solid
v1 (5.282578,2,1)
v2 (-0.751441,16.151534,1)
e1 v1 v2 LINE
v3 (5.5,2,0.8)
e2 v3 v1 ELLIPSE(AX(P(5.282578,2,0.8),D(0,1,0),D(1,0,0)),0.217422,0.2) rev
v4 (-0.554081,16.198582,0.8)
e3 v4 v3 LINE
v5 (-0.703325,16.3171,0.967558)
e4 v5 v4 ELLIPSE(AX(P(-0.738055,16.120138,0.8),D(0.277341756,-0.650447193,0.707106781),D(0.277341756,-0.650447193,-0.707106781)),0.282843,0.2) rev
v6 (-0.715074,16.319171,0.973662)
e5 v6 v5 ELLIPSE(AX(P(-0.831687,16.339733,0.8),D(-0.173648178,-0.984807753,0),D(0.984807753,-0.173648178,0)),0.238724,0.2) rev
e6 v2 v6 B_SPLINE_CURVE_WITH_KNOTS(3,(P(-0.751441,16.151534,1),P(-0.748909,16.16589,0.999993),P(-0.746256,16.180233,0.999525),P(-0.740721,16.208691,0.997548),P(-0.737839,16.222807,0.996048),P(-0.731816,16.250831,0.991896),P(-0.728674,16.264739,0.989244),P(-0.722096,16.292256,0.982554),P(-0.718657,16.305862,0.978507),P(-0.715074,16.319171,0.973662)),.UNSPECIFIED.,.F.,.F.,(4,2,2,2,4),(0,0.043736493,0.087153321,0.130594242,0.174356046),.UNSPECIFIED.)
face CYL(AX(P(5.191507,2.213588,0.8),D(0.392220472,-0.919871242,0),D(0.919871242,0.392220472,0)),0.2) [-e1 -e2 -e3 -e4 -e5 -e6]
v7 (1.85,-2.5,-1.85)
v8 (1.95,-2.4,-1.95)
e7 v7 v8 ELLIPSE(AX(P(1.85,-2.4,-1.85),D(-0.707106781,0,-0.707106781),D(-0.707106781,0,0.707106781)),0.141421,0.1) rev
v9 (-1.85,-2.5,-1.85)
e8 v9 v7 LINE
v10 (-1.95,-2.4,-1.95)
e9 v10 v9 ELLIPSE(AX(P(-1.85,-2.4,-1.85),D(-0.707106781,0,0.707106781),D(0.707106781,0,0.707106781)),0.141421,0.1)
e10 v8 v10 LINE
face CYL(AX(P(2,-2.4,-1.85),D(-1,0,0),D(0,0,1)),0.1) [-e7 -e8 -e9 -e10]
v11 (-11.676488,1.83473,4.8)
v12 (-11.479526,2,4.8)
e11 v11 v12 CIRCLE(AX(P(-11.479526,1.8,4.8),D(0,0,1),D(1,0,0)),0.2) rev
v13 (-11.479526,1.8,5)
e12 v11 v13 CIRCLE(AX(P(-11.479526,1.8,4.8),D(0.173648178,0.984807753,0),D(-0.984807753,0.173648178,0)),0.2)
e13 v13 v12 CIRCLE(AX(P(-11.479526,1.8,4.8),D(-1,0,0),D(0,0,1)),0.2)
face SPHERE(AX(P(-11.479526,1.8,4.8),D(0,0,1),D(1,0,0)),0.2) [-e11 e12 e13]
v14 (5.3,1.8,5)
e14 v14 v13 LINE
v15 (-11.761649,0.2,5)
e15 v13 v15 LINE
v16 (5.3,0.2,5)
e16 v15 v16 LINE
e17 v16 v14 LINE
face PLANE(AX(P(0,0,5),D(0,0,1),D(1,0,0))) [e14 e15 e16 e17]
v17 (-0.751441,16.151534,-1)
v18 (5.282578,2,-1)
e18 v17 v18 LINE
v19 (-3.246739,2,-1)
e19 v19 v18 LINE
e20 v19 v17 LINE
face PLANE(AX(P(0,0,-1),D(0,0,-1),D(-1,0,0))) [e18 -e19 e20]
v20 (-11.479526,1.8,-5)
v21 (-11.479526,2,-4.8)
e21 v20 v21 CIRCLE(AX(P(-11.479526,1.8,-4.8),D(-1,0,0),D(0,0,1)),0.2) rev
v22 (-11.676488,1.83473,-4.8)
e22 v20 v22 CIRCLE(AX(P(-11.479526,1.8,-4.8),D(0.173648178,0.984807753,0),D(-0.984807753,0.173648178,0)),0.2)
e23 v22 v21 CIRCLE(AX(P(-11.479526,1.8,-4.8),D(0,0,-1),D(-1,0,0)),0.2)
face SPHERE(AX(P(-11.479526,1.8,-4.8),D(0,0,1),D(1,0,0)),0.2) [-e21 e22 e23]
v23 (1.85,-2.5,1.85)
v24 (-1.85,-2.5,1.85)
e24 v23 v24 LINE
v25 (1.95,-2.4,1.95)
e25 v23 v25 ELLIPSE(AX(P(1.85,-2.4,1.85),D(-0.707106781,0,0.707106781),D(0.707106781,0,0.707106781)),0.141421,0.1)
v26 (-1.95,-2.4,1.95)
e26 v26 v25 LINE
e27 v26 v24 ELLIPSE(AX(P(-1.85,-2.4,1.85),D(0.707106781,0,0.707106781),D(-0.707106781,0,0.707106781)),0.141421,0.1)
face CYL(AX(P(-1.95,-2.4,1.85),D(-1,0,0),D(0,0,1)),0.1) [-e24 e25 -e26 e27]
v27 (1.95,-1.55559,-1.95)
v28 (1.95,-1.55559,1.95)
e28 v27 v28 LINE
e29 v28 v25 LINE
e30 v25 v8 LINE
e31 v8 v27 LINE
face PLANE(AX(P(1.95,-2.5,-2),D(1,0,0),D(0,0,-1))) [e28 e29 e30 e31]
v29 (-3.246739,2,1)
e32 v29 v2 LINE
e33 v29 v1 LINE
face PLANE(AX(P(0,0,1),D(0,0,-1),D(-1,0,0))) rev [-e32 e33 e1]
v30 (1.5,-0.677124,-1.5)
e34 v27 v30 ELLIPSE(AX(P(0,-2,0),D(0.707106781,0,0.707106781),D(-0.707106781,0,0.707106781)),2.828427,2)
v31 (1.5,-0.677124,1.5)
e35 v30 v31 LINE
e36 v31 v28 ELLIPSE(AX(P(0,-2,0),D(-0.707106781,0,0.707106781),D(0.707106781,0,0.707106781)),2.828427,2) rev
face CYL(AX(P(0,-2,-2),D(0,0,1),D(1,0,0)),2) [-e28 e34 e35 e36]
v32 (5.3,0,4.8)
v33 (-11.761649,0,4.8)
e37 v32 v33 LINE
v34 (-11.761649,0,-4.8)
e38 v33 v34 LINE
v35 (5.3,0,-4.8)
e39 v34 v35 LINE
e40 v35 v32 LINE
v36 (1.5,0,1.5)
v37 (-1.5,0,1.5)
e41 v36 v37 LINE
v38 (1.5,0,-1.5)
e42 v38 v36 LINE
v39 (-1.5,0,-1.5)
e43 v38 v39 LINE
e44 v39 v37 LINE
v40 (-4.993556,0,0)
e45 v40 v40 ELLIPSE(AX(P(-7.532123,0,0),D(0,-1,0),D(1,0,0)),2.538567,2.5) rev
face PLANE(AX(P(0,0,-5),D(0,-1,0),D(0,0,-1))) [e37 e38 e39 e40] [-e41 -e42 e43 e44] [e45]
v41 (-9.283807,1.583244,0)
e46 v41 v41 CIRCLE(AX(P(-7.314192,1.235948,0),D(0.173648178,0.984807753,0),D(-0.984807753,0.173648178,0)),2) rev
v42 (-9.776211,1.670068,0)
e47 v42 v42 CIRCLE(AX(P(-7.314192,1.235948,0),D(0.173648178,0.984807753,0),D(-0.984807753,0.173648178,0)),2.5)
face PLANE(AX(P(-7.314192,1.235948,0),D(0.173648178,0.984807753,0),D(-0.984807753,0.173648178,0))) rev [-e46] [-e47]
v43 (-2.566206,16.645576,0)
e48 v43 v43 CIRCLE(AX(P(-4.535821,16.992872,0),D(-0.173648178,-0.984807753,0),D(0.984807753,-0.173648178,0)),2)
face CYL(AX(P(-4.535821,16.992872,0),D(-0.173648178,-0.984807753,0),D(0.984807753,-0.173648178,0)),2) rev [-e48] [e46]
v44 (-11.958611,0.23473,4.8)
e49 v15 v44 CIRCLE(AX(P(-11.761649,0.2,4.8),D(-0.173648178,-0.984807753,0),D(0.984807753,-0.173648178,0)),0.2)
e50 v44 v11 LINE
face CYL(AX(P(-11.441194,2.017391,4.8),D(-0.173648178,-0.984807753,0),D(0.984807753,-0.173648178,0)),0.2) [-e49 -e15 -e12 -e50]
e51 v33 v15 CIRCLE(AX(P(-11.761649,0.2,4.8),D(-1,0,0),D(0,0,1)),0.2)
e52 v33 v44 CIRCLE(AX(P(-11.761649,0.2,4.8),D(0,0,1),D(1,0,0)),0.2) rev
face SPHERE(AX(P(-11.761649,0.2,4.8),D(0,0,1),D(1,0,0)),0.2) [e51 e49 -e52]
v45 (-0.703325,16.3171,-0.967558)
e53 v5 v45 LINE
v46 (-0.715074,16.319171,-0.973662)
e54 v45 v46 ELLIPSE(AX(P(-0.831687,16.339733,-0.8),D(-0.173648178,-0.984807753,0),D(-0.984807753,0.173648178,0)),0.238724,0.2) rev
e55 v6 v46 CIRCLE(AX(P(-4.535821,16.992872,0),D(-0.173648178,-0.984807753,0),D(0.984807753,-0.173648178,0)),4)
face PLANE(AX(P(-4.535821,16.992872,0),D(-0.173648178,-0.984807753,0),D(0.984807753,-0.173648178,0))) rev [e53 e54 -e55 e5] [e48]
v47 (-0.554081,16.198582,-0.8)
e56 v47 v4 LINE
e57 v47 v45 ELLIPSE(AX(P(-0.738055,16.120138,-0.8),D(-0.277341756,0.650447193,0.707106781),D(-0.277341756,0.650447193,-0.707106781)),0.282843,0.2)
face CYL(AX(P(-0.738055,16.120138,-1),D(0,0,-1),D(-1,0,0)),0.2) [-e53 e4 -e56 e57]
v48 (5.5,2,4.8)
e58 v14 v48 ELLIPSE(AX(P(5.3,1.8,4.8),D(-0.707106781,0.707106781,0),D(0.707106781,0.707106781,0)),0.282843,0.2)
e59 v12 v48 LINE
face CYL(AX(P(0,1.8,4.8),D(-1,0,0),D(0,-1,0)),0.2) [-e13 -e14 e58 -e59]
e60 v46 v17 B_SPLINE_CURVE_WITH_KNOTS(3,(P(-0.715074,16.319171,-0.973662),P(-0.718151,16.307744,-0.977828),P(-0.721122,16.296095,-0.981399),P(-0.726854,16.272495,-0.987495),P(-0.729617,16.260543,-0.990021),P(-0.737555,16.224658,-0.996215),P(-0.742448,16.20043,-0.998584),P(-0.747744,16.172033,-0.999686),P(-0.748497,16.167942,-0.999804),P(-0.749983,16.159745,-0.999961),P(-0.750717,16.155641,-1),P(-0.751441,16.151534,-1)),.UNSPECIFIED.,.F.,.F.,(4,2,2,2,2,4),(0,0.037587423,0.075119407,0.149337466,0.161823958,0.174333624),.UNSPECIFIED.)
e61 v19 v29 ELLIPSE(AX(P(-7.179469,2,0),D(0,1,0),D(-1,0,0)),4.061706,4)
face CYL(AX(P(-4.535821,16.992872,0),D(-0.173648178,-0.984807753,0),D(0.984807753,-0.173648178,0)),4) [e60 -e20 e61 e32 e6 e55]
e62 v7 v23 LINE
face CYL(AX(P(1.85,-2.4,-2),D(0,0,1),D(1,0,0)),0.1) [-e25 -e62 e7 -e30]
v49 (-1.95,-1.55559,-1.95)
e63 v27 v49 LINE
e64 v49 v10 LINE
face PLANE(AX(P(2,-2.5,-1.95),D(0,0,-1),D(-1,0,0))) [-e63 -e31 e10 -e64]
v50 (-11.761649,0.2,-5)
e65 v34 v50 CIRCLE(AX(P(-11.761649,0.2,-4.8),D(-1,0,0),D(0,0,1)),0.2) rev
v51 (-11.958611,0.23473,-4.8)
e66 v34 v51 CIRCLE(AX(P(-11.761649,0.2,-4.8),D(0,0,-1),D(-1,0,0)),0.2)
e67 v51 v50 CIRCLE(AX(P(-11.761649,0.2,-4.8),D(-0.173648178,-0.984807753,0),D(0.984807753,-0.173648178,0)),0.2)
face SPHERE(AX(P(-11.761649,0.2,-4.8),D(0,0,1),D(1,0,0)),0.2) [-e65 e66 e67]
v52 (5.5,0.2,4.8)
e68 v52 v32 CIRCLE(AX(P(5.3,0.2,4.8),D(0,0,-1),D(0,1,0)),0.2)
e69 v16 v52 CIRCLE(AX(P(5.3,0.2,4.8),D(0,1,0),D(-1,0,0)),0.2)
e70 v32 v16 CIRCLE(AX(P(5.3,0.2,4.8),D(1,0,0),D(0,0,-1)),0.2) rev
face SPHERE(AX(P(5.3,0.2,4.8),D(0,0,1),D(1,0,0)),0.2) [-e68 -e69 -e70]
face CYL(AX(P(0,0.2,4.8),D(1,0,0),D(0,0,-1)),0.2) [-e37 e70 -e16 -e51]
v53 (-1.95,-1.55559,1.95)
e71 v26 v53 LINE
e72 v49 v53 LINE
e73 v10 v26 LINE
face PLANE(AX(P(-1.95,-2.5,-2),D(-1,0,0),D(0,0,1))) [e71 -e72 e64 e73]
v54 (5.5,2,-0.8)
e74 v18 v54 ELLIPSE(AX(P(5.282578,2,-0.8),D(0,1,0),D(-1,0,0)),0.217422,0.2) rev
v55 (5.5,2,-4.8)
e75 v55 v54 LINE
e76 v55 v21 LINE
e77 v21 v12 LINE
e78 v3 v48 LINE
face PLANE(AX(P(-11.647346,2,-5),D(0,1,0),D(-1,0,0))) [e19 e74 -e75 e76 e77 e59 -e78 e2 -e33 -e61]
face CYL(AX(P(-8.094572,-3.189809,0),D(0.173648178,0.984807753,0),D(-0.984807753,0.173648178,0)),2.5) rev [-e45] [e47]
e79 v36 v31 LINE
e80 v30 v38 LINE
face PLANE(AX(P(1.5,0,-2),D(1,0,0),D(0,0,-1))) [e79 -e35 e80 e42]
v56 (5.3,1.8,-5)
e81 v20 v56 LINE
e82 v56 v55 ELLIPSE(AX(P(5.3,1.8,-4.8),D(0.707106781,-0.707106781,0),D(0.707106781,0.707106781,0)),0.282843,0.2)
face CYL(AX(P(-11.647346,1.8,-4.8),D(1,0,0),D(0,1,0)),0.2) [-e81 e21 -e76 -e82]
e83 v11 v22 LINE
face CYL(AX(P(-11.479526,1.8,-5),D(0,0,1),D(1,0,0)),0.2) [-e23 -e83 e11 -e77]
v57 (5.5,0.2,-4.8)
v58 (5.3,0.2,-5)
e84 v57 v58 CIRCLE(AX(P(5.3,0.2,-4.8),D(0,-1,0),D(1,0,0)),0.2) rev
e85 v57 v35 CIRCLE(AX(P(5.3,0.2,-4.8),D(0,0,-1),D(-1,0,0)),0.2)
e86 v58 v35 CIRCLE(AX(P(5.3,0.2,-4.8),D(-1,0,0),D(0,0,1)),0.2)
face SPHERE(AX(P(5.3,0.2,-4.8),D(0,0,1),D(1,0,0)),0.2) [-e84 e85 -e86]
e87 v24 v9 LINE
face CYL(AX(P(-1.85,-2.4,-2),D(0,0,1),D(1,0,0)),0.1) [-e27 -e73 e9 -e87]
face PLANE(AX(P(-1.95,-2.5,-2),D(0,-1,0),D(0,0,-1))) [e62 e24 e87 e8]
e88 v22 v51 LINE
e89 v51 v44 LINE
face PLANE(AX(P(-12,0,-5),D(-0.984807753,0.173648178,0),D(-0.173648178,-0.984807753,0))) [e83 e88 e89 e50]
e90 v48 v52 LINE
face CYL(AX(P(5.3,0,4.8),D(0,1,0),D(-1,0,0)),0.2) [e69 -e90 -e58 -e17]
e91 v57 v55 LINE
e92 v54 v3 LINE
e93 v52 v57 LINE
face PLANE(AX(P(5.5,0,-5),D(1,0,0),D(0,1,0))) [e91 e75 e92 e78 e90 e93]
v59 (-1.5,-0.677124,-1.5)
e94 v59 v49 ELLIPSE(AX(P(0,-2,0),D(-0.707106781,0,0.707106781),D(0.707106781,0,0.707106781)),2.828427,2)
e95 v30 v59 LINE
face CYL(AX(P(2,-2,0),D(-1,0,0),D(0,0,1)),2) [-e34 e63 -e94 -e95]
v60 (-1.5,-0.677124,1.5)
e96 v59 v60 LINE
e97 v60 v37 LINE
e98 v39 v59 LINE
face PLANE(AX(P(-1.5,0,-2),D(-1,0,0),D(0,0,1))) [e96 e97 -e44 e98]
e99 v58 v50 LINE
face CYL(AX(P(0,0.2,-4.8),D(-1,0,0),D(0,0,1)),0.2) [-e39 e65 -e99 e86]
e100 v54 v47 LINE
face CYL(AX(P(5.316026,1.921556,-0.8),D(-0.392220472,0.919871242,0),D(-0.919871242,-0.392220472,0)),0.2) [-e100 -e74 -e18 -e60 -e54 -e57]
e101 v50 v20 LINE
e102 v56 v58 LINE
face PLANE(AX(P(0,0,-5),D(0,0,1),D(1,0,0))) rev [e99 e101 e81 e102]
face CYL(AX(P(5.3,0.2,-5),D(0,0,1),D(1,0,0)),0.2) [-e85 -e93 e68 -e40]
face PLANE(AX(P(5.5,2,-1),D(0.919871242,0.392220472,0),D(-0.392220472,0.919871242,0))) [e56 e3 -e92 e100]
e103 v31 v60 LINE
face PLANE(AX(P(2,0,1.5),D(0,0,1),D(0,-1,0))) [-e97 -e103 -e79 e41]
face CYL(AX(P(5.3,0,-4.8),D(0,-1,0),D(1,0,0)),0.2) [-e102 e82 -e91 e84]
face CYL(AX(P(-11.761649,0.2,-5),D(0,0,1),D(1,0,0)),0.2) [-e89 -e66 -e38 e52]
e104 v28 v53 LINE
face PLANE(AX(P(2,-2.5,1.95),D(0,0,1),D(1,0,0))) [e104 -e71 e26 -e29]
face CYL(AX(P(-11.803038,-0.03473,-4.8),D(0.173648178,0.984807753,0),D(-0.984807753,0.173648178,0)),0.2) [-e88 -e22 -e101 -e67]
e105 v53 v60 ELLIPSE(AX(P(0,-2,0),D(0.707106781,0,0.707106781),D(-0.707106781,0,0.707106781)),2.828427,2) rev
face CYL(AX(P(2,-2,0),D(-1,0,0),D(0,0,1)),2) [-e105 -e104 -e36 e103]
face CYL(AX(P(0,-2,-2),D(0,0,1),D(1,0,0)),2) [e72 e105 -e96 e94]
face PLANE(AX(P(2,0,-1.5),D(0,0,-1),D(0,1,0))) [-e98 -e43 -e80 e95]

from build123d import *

# Parameters (mm, degrees)
EXTRUDE_1_DEPTH          = 5
EXTRUDE_1_DEPTH_BACK     = 5
EXTRUDE_2_DEPTH          = 2
EXTRUDE_2_DEPTH_BACK     = 2
CUT_EXTRUDE_1_DEPTH      = 2
CUT_EXTRUDE_1_DEPTH_BACK = 2
SKETCH_5_R               = 4
SKETCH_5_R_2             = 2
EXTRUDE_3_DEPTH          = 16
EXTRUDE_4_DEPTH          = 1
EXTRUDE_4_DEPTH_BACK     = 1
CUT_EXTRUDE_2_REACH      = 41.97
CUT_EXTRUDE_START        = -16
SKETCH_7_R               = 2.5
CUT_EXTRUDE_3_REACH      = 25.97
SKETCH_8_R               = 2
FILLET_3_R               = 0.2
FILLET_5_R               = 0.2
FILLET_7_R               = 0.2
FILLET_8_R               = 0.1


with BuildPart() as part:
    # 草图1 → 凸台-拉伸1 (new, two sides: drawn at the far end of the back side and taken through both)
    with BuildSketch(Plane.XY.offset(-EXTRUDE_1_DEPTH_BACK)):
        Polygon((0, 0), (5.5, 0), (5.5, 2), (-11.647346039, 2), (-12, 0), align=None)
    extrude(amount=EXTRUDE_1_DEPTH + EXTRUDE_1_DEPTH_BACK)

    # 草图2 → 凸台-拉伸2 (add, two sides: drawn at the far end of the back side and taken through both)
    with BuildSketch(Plane.XY.offset(-EXTRUDE_2_DEPTH_BACK)):
        with BuildLine():
            Line((-1.5, 0), (1.5, 0))
            Line((1.5, 0), (1.5, -0.677124344))
            ThreePointArc((1.5, -0.677124344), (1.780042303, -1.088161527), (1.95, -1.555590279))
            Line((1.95, -1.555590279), (1.95, -2.5))
            Line((1.95, -2.5), (-1.95, -2.5))
            Line((-1.95, -2.5), (-1.95, -1.555590279))
            ThreePointArc((-1.95, -1.555590279), (-1.780042303, -1.088161527), (-1.5, -0.677124344))
            Line((-1.5, -0.677124344), (-1.5, 0))
        make_face()
    extrude(amount=EXTRUDE_2_DEPTH + EXTRUDE_2_DEPTH_BACK)

    # 草图3 → 切除-拉伸1 (cut, two sides: drawn at the far end of the back side and taken through both)
    with BuildSketch(Plane(origin=(0, 0, 0), x_dir=(0, 0, -1), z_dir=(1, 0, 0)).offset(-CUT_EXTRUDE_1_DEPTH_BACK)):
        with BuildLine():
            Line((1.5, 0), (1.5, -0.677124344))
            ThreePointArc((1.5, -0.677124344), (1.780042303, -1.088161527), (1.95, -1.555590279))
            Line((1.95, -1.555590279), (1.95, -2.5))
            Line((1.95, -2.5), (2, -2.5))
            Line((2, -2.5), (2, 0))
            Line((2, 0), (1.5, 0))
        make_face()
        with BuildLine():
            Line((-2, 0), (-1.5, 0))
            Line((-1.5, 0), (-1.5, -0.677124344))
            ThreePointArc((-1.5, -0.677124344), (-1.780042303, -1.088161527), (-1.95, -1.555590279))
            Line((-1.95, -1.555590279), (-1.95, -2.5))
            Line((-1.95, -2.5), (-2, -2.5))
            Line((-2, -2.5), (-2, 0))
        make_face()
    extrude(amount=CUT_EXTRUDE_1_DEPTH + CUT_EXTRUDE_1_DEPTH_BACK, mode=Mode.SUBTRACT)

    # 草图5 → 凸台-拉伸3 (add)
    with BuildSketch(Plane(origin=(-11.647346039, 2, 5), x_dir=(-0.9848077530122089, 0.17364817766692556, 0), z_dir=(-0.17364817766692556, -0.984807753012209, 0))):
        with Locations(Location((-4.4, 5, 0), (0, 0, 180))):
            Circle(SKETCH_5_R)
        with Locations(Location((-4.4, 5, 0), (0, 0, 180))):
            Circle(SKETCH_5_R_2, mode=Mode.SUBTRACT)
    extrude(amount=-EXTRUDE_3_DEPTH)

    # 草图6 → 凸台-拉伸4 (add, two sides: drawn at the far end of the back side and taken through both)
    with BuildSketch(Plane.XY.offset(-EXTRUDE_4_DEPTH_BACK)):
        Polygon((5.5, 2), (-0.596590071, 16.298279356), (-2.0738017, 16.558751622), (-4.640902417, 2), align=None)
    extrude(amount=EXTRUDE_4_DEPTH + EXTRUDE_4_DEPTH_BACK)

    # 切除-拉伸2: up to this plane
    cut_extrude_2_end = Plane(origin=(0, 0, -5), z_dir=(0, -1, 0))
    # 草图7 → 切除-拉伸2 (cut, up to the surface)
    with BuildSketch(Plane(origin=(2.769180529, 15.704803188, 0), x_dir=(0.9848077530122089, -0.17364817766692558, 0), z_dir=(0.17364817766692558, 0.984807753012209, 0)).offset(CUT_EXTRUDE_START), mode=Mode.PRIVATE) as cut_extrude_2_sk1:
        with Locations(Location((-7.417693036, 0, 0), (0, 0, 180))):
            Circle(SKETCH_7_R)
    cut_extrude_2_tool1 = split(extrude(cut_extrude_2_sk1.sketch, amount=-CUT_EXTRUDE_2_REACH, mode=Mode.PRIVATE), bisect_by=cut_extrude_2_end, keep=Keep.BOTH, mode=Mode.PRIVATE)
    add(cut_extrude_2_tool1.solids().sort_by_distance((-7.314192, 1.235948, 0))[0], mode=Mode.SUBTRACT)

    # 草图8 → 切除-拉伸3 (cut, up to next)
    with BuildSketch(Plane(origin=(2.769180529, 15.704803188, 0), x_dir=(0.9848077530122089, -0.17364817766692558, 0), z_dir=(0.17364817766692558, 0.984807753012209, 0)), mode=Mode.PRIVATE) as cut_extrude_3_sk1:
        with Locations((-7.417693036, 0)):
            Circle(SKETCH_8_R)
    cut_extrude_3_tool1 = extrude(cut_extrude_3_sk1.sketch, amount=-CUT_EXTRUDE_3_REACH, mode=Mode.PRIVATE) & part.part
    add(cut_extrude_3_tool1.solids().sort_by_distance((-4.535821, 16.992872, 0))[0], mode=Mode.SUBTRACT)

    # 圆角3
    fillet_3_edges = [part.edges().sort_by_distance(p)[0] for p in [
        (5.5, 1, -5),
        (-3.073673019, 2, -5),
        (-3.25, 0, 5),
        (5.5, 1, 5),
        (-11.823673019, 1, -5),
        (-3.073673019, 2, 5),
        (-11.823673019, 1, 5),
        (-3.25, 0, -5),
        (-12, 0, 0),
        (-11.647346039, 2, 0),
    ]]
    fillet(fillet_3_edges, radius=FILLET_3_R)

    # 圆角5
    # the kernel refuses this fillet: 0.2 mm, written as the material it takes off along each edge
    with BuildSketch(Plane(origin=(5.3, 0.2, 4.8), x_dir=(1, 0, 0), z_dir=(0, -1, 0))) as fillet_5_piece_1_section:
        Polygon((0, 0), (FILLET_5_R, 0), (FILLET_5_R, FILLET_5_R), (0, FILLET_5_R), align=None)
    fillet_5_piece_1 = extrude(amount=FILLET_5_R, mode=Mode.PRIVATE)
    fillet_5_piece_1 = fillet_5_piece_1 - Plane(origin=(5.3, 0.2, 4.8), x_dir=(-0.7071067811865475, 0, -0.7071067811865475), z_dir=(0, -1, 0)) * Sphere(FILLET_5_R, mode=Mode.PRIVATE)
    add(fillet_5_piece_1, mode=Mode.SUBTRACT)
    with BuildSketch(Plane(origin=(5.3, 0.2, -4.8), x_dir=(1, 0, 0), z_dir=(0, -1, 0))) as fillet_5_piece_2_section:
        Polygon((0, 0), (FILLET_5_R, 0), (FILLET_5_R, -FILLET_5_R), (0, -FILLET_5_R), align=None)
    fillet_5_piece_2 = extrude(amount=FILLET_5_R, mode=Mode.PRIVATE)
    fillet_5_piece_2 = fillet_5_piece_2 - Plane(origin=(5.3, 0.2, -4.8), x_dir=(-0.7071067811865475, 0, 0.7071067811865475), z_dir=(0, -1, 0)) * Sphere(FILLET_5_R, mode=Mode.PRIVATE)
    add(fillet_5_piece_2, mode=Mode.SUBTRACT)
    with BuildSketch(Plane(origin=(5.5, 0, -4.8), x_dir=(-1, 0, 0), z_dir=(0, 0, 1))) as fillet_5_piece_3:
        with BuildLine():
            CenterArc((FILLET_5_R, -FILLET_5_R), FILLET_5_R, 90, 90)
            Line((0, -FILLET_5_R), (0, 0))
            Line((0, 0), (FILLET_5_R, 0))
        make_face()
    extrude(amount=9.6, mode=Mode.SUBTRACT)

    # 圆角7
    # the kernel refuses this fillet: 0.2 mm, written as the material it takes off along each edge
    with BuildSketch(Plane(origin=(-0.596590071, 16.298279356, -1.270954164), x_dir=(0.39222047204702226, -0.9198712417002779, 0), z_dir=(0, 0, 1))) as fillet_7_piece_1:
        with BuildLine():
            CenterArc((FILLET_7_R * 0.541908328714, -FILLET_7_R), FILLET_7_R, 90, 56.907265605)
            Line((-FILLET_7_R * 0.295879631671, -FILLET_7_R * 0.454004273429), (0, 0))
            Line((0, 0), (FILLET_7_R * 0.541908328714, 0))
        make_face()
    extrude(amount=2.541908329, mode=Mode.SUBTRACT)
    with BuildSketch(Plane(origin=(5.696110236, 1.540064379, -1), x_dir=(0, 0, 1), z_dir=(-0.39222047204701954, 0.9198712417002791, 0))) as fillet_7_piece_2_section:
        with BuildLine():
            CenterArc((FILLET_7_R, -FILLET_7_R), FILLET_7_R, 90, 90)
            Line((0, -FILLET_7_R), (0, 0))
            Line((0, 0), (FILLET_7_R, 0))
        make_face()
    fillet_7_piece_2 = extrude(amount=16.543783421, mode=Mode.PRIVATE)
    fillet_7_piece_2 = split(fillet_7_piece_2, bisect_by=Plane(origin=(2.402045939, 2, -0.955327029), z_dir=(0, 1, 0)), keep=Keep.TOP, mode=Mode.PRIVATE)
    fillet_7_piece_2 = fillet_7_piece_2 - Plane(origin=(-5.66753398, 10.574609288, 0), x_dir=(0.984807753012209, -0.17364817766692556, 0), z_dir=(-0.17364817766692556, -0.984807753012209, 0)) * Cylinder(4, 34, mode=Mode.PRIVATE)
    add(fillet_7_piece_2, mode=Mode.SUBTRACT)
    with BuildSketch(Plane(origin=(5.696110236, 1.540064379, 1), x_dir=(0, 0, -1), z_dir=(-0.39222047204701954, 0.9198712417002791, 0))) as fillet_7_piece_3_section:
        with BuildLine():
            CenterArc((FILLET_7_R, FILLET_7_R), FILLET_7_R, 180, 90)
            Line((0, FILLET_7_R), (0, 0))
            Line((0, 0), (FILLET_7_R, 0))
        make_face()
    fillet_7_piece_3 = extrude(amount=16.543783421, mode=Mode.PRIVATE)
    fillet_7_piece_3 = split(fillet_7_piece_3, bisect_by=Plane(origin=(2.402045936, 2, 0.955327029), z_dir=(0, 1, 0)), keep=Keep.TOP, mode=Mode.PRIVATE)
    fillet_7_piece_3 = fillet_7_piece_3 - Plane(origin=(-5.667533979, 10.574609294, 0), x_dir=(0.984807753012209, -0.17364817766692556, 0), z_dir=(-0.17364817766692556, -0.984807753012209, 0)) * Cylinder(4, 34, mode=Mode.PRIVATE)
    add(fillet_7_piece_3, mode=Mode.SUBTRACT)

    # 圆角8
    fillet_8_edges = [part.edges().sort_by_distance(p)[0] for p in [
        (0, -2.5, 1.95),
        (1.95, -2.5, 0),
        (-1.95, -2.5, 0),
        (0, -2.5, -1.95),
    ]]
    fillet(fillet_8_edges, radius=FILLET_8_R)


solid = part.part
